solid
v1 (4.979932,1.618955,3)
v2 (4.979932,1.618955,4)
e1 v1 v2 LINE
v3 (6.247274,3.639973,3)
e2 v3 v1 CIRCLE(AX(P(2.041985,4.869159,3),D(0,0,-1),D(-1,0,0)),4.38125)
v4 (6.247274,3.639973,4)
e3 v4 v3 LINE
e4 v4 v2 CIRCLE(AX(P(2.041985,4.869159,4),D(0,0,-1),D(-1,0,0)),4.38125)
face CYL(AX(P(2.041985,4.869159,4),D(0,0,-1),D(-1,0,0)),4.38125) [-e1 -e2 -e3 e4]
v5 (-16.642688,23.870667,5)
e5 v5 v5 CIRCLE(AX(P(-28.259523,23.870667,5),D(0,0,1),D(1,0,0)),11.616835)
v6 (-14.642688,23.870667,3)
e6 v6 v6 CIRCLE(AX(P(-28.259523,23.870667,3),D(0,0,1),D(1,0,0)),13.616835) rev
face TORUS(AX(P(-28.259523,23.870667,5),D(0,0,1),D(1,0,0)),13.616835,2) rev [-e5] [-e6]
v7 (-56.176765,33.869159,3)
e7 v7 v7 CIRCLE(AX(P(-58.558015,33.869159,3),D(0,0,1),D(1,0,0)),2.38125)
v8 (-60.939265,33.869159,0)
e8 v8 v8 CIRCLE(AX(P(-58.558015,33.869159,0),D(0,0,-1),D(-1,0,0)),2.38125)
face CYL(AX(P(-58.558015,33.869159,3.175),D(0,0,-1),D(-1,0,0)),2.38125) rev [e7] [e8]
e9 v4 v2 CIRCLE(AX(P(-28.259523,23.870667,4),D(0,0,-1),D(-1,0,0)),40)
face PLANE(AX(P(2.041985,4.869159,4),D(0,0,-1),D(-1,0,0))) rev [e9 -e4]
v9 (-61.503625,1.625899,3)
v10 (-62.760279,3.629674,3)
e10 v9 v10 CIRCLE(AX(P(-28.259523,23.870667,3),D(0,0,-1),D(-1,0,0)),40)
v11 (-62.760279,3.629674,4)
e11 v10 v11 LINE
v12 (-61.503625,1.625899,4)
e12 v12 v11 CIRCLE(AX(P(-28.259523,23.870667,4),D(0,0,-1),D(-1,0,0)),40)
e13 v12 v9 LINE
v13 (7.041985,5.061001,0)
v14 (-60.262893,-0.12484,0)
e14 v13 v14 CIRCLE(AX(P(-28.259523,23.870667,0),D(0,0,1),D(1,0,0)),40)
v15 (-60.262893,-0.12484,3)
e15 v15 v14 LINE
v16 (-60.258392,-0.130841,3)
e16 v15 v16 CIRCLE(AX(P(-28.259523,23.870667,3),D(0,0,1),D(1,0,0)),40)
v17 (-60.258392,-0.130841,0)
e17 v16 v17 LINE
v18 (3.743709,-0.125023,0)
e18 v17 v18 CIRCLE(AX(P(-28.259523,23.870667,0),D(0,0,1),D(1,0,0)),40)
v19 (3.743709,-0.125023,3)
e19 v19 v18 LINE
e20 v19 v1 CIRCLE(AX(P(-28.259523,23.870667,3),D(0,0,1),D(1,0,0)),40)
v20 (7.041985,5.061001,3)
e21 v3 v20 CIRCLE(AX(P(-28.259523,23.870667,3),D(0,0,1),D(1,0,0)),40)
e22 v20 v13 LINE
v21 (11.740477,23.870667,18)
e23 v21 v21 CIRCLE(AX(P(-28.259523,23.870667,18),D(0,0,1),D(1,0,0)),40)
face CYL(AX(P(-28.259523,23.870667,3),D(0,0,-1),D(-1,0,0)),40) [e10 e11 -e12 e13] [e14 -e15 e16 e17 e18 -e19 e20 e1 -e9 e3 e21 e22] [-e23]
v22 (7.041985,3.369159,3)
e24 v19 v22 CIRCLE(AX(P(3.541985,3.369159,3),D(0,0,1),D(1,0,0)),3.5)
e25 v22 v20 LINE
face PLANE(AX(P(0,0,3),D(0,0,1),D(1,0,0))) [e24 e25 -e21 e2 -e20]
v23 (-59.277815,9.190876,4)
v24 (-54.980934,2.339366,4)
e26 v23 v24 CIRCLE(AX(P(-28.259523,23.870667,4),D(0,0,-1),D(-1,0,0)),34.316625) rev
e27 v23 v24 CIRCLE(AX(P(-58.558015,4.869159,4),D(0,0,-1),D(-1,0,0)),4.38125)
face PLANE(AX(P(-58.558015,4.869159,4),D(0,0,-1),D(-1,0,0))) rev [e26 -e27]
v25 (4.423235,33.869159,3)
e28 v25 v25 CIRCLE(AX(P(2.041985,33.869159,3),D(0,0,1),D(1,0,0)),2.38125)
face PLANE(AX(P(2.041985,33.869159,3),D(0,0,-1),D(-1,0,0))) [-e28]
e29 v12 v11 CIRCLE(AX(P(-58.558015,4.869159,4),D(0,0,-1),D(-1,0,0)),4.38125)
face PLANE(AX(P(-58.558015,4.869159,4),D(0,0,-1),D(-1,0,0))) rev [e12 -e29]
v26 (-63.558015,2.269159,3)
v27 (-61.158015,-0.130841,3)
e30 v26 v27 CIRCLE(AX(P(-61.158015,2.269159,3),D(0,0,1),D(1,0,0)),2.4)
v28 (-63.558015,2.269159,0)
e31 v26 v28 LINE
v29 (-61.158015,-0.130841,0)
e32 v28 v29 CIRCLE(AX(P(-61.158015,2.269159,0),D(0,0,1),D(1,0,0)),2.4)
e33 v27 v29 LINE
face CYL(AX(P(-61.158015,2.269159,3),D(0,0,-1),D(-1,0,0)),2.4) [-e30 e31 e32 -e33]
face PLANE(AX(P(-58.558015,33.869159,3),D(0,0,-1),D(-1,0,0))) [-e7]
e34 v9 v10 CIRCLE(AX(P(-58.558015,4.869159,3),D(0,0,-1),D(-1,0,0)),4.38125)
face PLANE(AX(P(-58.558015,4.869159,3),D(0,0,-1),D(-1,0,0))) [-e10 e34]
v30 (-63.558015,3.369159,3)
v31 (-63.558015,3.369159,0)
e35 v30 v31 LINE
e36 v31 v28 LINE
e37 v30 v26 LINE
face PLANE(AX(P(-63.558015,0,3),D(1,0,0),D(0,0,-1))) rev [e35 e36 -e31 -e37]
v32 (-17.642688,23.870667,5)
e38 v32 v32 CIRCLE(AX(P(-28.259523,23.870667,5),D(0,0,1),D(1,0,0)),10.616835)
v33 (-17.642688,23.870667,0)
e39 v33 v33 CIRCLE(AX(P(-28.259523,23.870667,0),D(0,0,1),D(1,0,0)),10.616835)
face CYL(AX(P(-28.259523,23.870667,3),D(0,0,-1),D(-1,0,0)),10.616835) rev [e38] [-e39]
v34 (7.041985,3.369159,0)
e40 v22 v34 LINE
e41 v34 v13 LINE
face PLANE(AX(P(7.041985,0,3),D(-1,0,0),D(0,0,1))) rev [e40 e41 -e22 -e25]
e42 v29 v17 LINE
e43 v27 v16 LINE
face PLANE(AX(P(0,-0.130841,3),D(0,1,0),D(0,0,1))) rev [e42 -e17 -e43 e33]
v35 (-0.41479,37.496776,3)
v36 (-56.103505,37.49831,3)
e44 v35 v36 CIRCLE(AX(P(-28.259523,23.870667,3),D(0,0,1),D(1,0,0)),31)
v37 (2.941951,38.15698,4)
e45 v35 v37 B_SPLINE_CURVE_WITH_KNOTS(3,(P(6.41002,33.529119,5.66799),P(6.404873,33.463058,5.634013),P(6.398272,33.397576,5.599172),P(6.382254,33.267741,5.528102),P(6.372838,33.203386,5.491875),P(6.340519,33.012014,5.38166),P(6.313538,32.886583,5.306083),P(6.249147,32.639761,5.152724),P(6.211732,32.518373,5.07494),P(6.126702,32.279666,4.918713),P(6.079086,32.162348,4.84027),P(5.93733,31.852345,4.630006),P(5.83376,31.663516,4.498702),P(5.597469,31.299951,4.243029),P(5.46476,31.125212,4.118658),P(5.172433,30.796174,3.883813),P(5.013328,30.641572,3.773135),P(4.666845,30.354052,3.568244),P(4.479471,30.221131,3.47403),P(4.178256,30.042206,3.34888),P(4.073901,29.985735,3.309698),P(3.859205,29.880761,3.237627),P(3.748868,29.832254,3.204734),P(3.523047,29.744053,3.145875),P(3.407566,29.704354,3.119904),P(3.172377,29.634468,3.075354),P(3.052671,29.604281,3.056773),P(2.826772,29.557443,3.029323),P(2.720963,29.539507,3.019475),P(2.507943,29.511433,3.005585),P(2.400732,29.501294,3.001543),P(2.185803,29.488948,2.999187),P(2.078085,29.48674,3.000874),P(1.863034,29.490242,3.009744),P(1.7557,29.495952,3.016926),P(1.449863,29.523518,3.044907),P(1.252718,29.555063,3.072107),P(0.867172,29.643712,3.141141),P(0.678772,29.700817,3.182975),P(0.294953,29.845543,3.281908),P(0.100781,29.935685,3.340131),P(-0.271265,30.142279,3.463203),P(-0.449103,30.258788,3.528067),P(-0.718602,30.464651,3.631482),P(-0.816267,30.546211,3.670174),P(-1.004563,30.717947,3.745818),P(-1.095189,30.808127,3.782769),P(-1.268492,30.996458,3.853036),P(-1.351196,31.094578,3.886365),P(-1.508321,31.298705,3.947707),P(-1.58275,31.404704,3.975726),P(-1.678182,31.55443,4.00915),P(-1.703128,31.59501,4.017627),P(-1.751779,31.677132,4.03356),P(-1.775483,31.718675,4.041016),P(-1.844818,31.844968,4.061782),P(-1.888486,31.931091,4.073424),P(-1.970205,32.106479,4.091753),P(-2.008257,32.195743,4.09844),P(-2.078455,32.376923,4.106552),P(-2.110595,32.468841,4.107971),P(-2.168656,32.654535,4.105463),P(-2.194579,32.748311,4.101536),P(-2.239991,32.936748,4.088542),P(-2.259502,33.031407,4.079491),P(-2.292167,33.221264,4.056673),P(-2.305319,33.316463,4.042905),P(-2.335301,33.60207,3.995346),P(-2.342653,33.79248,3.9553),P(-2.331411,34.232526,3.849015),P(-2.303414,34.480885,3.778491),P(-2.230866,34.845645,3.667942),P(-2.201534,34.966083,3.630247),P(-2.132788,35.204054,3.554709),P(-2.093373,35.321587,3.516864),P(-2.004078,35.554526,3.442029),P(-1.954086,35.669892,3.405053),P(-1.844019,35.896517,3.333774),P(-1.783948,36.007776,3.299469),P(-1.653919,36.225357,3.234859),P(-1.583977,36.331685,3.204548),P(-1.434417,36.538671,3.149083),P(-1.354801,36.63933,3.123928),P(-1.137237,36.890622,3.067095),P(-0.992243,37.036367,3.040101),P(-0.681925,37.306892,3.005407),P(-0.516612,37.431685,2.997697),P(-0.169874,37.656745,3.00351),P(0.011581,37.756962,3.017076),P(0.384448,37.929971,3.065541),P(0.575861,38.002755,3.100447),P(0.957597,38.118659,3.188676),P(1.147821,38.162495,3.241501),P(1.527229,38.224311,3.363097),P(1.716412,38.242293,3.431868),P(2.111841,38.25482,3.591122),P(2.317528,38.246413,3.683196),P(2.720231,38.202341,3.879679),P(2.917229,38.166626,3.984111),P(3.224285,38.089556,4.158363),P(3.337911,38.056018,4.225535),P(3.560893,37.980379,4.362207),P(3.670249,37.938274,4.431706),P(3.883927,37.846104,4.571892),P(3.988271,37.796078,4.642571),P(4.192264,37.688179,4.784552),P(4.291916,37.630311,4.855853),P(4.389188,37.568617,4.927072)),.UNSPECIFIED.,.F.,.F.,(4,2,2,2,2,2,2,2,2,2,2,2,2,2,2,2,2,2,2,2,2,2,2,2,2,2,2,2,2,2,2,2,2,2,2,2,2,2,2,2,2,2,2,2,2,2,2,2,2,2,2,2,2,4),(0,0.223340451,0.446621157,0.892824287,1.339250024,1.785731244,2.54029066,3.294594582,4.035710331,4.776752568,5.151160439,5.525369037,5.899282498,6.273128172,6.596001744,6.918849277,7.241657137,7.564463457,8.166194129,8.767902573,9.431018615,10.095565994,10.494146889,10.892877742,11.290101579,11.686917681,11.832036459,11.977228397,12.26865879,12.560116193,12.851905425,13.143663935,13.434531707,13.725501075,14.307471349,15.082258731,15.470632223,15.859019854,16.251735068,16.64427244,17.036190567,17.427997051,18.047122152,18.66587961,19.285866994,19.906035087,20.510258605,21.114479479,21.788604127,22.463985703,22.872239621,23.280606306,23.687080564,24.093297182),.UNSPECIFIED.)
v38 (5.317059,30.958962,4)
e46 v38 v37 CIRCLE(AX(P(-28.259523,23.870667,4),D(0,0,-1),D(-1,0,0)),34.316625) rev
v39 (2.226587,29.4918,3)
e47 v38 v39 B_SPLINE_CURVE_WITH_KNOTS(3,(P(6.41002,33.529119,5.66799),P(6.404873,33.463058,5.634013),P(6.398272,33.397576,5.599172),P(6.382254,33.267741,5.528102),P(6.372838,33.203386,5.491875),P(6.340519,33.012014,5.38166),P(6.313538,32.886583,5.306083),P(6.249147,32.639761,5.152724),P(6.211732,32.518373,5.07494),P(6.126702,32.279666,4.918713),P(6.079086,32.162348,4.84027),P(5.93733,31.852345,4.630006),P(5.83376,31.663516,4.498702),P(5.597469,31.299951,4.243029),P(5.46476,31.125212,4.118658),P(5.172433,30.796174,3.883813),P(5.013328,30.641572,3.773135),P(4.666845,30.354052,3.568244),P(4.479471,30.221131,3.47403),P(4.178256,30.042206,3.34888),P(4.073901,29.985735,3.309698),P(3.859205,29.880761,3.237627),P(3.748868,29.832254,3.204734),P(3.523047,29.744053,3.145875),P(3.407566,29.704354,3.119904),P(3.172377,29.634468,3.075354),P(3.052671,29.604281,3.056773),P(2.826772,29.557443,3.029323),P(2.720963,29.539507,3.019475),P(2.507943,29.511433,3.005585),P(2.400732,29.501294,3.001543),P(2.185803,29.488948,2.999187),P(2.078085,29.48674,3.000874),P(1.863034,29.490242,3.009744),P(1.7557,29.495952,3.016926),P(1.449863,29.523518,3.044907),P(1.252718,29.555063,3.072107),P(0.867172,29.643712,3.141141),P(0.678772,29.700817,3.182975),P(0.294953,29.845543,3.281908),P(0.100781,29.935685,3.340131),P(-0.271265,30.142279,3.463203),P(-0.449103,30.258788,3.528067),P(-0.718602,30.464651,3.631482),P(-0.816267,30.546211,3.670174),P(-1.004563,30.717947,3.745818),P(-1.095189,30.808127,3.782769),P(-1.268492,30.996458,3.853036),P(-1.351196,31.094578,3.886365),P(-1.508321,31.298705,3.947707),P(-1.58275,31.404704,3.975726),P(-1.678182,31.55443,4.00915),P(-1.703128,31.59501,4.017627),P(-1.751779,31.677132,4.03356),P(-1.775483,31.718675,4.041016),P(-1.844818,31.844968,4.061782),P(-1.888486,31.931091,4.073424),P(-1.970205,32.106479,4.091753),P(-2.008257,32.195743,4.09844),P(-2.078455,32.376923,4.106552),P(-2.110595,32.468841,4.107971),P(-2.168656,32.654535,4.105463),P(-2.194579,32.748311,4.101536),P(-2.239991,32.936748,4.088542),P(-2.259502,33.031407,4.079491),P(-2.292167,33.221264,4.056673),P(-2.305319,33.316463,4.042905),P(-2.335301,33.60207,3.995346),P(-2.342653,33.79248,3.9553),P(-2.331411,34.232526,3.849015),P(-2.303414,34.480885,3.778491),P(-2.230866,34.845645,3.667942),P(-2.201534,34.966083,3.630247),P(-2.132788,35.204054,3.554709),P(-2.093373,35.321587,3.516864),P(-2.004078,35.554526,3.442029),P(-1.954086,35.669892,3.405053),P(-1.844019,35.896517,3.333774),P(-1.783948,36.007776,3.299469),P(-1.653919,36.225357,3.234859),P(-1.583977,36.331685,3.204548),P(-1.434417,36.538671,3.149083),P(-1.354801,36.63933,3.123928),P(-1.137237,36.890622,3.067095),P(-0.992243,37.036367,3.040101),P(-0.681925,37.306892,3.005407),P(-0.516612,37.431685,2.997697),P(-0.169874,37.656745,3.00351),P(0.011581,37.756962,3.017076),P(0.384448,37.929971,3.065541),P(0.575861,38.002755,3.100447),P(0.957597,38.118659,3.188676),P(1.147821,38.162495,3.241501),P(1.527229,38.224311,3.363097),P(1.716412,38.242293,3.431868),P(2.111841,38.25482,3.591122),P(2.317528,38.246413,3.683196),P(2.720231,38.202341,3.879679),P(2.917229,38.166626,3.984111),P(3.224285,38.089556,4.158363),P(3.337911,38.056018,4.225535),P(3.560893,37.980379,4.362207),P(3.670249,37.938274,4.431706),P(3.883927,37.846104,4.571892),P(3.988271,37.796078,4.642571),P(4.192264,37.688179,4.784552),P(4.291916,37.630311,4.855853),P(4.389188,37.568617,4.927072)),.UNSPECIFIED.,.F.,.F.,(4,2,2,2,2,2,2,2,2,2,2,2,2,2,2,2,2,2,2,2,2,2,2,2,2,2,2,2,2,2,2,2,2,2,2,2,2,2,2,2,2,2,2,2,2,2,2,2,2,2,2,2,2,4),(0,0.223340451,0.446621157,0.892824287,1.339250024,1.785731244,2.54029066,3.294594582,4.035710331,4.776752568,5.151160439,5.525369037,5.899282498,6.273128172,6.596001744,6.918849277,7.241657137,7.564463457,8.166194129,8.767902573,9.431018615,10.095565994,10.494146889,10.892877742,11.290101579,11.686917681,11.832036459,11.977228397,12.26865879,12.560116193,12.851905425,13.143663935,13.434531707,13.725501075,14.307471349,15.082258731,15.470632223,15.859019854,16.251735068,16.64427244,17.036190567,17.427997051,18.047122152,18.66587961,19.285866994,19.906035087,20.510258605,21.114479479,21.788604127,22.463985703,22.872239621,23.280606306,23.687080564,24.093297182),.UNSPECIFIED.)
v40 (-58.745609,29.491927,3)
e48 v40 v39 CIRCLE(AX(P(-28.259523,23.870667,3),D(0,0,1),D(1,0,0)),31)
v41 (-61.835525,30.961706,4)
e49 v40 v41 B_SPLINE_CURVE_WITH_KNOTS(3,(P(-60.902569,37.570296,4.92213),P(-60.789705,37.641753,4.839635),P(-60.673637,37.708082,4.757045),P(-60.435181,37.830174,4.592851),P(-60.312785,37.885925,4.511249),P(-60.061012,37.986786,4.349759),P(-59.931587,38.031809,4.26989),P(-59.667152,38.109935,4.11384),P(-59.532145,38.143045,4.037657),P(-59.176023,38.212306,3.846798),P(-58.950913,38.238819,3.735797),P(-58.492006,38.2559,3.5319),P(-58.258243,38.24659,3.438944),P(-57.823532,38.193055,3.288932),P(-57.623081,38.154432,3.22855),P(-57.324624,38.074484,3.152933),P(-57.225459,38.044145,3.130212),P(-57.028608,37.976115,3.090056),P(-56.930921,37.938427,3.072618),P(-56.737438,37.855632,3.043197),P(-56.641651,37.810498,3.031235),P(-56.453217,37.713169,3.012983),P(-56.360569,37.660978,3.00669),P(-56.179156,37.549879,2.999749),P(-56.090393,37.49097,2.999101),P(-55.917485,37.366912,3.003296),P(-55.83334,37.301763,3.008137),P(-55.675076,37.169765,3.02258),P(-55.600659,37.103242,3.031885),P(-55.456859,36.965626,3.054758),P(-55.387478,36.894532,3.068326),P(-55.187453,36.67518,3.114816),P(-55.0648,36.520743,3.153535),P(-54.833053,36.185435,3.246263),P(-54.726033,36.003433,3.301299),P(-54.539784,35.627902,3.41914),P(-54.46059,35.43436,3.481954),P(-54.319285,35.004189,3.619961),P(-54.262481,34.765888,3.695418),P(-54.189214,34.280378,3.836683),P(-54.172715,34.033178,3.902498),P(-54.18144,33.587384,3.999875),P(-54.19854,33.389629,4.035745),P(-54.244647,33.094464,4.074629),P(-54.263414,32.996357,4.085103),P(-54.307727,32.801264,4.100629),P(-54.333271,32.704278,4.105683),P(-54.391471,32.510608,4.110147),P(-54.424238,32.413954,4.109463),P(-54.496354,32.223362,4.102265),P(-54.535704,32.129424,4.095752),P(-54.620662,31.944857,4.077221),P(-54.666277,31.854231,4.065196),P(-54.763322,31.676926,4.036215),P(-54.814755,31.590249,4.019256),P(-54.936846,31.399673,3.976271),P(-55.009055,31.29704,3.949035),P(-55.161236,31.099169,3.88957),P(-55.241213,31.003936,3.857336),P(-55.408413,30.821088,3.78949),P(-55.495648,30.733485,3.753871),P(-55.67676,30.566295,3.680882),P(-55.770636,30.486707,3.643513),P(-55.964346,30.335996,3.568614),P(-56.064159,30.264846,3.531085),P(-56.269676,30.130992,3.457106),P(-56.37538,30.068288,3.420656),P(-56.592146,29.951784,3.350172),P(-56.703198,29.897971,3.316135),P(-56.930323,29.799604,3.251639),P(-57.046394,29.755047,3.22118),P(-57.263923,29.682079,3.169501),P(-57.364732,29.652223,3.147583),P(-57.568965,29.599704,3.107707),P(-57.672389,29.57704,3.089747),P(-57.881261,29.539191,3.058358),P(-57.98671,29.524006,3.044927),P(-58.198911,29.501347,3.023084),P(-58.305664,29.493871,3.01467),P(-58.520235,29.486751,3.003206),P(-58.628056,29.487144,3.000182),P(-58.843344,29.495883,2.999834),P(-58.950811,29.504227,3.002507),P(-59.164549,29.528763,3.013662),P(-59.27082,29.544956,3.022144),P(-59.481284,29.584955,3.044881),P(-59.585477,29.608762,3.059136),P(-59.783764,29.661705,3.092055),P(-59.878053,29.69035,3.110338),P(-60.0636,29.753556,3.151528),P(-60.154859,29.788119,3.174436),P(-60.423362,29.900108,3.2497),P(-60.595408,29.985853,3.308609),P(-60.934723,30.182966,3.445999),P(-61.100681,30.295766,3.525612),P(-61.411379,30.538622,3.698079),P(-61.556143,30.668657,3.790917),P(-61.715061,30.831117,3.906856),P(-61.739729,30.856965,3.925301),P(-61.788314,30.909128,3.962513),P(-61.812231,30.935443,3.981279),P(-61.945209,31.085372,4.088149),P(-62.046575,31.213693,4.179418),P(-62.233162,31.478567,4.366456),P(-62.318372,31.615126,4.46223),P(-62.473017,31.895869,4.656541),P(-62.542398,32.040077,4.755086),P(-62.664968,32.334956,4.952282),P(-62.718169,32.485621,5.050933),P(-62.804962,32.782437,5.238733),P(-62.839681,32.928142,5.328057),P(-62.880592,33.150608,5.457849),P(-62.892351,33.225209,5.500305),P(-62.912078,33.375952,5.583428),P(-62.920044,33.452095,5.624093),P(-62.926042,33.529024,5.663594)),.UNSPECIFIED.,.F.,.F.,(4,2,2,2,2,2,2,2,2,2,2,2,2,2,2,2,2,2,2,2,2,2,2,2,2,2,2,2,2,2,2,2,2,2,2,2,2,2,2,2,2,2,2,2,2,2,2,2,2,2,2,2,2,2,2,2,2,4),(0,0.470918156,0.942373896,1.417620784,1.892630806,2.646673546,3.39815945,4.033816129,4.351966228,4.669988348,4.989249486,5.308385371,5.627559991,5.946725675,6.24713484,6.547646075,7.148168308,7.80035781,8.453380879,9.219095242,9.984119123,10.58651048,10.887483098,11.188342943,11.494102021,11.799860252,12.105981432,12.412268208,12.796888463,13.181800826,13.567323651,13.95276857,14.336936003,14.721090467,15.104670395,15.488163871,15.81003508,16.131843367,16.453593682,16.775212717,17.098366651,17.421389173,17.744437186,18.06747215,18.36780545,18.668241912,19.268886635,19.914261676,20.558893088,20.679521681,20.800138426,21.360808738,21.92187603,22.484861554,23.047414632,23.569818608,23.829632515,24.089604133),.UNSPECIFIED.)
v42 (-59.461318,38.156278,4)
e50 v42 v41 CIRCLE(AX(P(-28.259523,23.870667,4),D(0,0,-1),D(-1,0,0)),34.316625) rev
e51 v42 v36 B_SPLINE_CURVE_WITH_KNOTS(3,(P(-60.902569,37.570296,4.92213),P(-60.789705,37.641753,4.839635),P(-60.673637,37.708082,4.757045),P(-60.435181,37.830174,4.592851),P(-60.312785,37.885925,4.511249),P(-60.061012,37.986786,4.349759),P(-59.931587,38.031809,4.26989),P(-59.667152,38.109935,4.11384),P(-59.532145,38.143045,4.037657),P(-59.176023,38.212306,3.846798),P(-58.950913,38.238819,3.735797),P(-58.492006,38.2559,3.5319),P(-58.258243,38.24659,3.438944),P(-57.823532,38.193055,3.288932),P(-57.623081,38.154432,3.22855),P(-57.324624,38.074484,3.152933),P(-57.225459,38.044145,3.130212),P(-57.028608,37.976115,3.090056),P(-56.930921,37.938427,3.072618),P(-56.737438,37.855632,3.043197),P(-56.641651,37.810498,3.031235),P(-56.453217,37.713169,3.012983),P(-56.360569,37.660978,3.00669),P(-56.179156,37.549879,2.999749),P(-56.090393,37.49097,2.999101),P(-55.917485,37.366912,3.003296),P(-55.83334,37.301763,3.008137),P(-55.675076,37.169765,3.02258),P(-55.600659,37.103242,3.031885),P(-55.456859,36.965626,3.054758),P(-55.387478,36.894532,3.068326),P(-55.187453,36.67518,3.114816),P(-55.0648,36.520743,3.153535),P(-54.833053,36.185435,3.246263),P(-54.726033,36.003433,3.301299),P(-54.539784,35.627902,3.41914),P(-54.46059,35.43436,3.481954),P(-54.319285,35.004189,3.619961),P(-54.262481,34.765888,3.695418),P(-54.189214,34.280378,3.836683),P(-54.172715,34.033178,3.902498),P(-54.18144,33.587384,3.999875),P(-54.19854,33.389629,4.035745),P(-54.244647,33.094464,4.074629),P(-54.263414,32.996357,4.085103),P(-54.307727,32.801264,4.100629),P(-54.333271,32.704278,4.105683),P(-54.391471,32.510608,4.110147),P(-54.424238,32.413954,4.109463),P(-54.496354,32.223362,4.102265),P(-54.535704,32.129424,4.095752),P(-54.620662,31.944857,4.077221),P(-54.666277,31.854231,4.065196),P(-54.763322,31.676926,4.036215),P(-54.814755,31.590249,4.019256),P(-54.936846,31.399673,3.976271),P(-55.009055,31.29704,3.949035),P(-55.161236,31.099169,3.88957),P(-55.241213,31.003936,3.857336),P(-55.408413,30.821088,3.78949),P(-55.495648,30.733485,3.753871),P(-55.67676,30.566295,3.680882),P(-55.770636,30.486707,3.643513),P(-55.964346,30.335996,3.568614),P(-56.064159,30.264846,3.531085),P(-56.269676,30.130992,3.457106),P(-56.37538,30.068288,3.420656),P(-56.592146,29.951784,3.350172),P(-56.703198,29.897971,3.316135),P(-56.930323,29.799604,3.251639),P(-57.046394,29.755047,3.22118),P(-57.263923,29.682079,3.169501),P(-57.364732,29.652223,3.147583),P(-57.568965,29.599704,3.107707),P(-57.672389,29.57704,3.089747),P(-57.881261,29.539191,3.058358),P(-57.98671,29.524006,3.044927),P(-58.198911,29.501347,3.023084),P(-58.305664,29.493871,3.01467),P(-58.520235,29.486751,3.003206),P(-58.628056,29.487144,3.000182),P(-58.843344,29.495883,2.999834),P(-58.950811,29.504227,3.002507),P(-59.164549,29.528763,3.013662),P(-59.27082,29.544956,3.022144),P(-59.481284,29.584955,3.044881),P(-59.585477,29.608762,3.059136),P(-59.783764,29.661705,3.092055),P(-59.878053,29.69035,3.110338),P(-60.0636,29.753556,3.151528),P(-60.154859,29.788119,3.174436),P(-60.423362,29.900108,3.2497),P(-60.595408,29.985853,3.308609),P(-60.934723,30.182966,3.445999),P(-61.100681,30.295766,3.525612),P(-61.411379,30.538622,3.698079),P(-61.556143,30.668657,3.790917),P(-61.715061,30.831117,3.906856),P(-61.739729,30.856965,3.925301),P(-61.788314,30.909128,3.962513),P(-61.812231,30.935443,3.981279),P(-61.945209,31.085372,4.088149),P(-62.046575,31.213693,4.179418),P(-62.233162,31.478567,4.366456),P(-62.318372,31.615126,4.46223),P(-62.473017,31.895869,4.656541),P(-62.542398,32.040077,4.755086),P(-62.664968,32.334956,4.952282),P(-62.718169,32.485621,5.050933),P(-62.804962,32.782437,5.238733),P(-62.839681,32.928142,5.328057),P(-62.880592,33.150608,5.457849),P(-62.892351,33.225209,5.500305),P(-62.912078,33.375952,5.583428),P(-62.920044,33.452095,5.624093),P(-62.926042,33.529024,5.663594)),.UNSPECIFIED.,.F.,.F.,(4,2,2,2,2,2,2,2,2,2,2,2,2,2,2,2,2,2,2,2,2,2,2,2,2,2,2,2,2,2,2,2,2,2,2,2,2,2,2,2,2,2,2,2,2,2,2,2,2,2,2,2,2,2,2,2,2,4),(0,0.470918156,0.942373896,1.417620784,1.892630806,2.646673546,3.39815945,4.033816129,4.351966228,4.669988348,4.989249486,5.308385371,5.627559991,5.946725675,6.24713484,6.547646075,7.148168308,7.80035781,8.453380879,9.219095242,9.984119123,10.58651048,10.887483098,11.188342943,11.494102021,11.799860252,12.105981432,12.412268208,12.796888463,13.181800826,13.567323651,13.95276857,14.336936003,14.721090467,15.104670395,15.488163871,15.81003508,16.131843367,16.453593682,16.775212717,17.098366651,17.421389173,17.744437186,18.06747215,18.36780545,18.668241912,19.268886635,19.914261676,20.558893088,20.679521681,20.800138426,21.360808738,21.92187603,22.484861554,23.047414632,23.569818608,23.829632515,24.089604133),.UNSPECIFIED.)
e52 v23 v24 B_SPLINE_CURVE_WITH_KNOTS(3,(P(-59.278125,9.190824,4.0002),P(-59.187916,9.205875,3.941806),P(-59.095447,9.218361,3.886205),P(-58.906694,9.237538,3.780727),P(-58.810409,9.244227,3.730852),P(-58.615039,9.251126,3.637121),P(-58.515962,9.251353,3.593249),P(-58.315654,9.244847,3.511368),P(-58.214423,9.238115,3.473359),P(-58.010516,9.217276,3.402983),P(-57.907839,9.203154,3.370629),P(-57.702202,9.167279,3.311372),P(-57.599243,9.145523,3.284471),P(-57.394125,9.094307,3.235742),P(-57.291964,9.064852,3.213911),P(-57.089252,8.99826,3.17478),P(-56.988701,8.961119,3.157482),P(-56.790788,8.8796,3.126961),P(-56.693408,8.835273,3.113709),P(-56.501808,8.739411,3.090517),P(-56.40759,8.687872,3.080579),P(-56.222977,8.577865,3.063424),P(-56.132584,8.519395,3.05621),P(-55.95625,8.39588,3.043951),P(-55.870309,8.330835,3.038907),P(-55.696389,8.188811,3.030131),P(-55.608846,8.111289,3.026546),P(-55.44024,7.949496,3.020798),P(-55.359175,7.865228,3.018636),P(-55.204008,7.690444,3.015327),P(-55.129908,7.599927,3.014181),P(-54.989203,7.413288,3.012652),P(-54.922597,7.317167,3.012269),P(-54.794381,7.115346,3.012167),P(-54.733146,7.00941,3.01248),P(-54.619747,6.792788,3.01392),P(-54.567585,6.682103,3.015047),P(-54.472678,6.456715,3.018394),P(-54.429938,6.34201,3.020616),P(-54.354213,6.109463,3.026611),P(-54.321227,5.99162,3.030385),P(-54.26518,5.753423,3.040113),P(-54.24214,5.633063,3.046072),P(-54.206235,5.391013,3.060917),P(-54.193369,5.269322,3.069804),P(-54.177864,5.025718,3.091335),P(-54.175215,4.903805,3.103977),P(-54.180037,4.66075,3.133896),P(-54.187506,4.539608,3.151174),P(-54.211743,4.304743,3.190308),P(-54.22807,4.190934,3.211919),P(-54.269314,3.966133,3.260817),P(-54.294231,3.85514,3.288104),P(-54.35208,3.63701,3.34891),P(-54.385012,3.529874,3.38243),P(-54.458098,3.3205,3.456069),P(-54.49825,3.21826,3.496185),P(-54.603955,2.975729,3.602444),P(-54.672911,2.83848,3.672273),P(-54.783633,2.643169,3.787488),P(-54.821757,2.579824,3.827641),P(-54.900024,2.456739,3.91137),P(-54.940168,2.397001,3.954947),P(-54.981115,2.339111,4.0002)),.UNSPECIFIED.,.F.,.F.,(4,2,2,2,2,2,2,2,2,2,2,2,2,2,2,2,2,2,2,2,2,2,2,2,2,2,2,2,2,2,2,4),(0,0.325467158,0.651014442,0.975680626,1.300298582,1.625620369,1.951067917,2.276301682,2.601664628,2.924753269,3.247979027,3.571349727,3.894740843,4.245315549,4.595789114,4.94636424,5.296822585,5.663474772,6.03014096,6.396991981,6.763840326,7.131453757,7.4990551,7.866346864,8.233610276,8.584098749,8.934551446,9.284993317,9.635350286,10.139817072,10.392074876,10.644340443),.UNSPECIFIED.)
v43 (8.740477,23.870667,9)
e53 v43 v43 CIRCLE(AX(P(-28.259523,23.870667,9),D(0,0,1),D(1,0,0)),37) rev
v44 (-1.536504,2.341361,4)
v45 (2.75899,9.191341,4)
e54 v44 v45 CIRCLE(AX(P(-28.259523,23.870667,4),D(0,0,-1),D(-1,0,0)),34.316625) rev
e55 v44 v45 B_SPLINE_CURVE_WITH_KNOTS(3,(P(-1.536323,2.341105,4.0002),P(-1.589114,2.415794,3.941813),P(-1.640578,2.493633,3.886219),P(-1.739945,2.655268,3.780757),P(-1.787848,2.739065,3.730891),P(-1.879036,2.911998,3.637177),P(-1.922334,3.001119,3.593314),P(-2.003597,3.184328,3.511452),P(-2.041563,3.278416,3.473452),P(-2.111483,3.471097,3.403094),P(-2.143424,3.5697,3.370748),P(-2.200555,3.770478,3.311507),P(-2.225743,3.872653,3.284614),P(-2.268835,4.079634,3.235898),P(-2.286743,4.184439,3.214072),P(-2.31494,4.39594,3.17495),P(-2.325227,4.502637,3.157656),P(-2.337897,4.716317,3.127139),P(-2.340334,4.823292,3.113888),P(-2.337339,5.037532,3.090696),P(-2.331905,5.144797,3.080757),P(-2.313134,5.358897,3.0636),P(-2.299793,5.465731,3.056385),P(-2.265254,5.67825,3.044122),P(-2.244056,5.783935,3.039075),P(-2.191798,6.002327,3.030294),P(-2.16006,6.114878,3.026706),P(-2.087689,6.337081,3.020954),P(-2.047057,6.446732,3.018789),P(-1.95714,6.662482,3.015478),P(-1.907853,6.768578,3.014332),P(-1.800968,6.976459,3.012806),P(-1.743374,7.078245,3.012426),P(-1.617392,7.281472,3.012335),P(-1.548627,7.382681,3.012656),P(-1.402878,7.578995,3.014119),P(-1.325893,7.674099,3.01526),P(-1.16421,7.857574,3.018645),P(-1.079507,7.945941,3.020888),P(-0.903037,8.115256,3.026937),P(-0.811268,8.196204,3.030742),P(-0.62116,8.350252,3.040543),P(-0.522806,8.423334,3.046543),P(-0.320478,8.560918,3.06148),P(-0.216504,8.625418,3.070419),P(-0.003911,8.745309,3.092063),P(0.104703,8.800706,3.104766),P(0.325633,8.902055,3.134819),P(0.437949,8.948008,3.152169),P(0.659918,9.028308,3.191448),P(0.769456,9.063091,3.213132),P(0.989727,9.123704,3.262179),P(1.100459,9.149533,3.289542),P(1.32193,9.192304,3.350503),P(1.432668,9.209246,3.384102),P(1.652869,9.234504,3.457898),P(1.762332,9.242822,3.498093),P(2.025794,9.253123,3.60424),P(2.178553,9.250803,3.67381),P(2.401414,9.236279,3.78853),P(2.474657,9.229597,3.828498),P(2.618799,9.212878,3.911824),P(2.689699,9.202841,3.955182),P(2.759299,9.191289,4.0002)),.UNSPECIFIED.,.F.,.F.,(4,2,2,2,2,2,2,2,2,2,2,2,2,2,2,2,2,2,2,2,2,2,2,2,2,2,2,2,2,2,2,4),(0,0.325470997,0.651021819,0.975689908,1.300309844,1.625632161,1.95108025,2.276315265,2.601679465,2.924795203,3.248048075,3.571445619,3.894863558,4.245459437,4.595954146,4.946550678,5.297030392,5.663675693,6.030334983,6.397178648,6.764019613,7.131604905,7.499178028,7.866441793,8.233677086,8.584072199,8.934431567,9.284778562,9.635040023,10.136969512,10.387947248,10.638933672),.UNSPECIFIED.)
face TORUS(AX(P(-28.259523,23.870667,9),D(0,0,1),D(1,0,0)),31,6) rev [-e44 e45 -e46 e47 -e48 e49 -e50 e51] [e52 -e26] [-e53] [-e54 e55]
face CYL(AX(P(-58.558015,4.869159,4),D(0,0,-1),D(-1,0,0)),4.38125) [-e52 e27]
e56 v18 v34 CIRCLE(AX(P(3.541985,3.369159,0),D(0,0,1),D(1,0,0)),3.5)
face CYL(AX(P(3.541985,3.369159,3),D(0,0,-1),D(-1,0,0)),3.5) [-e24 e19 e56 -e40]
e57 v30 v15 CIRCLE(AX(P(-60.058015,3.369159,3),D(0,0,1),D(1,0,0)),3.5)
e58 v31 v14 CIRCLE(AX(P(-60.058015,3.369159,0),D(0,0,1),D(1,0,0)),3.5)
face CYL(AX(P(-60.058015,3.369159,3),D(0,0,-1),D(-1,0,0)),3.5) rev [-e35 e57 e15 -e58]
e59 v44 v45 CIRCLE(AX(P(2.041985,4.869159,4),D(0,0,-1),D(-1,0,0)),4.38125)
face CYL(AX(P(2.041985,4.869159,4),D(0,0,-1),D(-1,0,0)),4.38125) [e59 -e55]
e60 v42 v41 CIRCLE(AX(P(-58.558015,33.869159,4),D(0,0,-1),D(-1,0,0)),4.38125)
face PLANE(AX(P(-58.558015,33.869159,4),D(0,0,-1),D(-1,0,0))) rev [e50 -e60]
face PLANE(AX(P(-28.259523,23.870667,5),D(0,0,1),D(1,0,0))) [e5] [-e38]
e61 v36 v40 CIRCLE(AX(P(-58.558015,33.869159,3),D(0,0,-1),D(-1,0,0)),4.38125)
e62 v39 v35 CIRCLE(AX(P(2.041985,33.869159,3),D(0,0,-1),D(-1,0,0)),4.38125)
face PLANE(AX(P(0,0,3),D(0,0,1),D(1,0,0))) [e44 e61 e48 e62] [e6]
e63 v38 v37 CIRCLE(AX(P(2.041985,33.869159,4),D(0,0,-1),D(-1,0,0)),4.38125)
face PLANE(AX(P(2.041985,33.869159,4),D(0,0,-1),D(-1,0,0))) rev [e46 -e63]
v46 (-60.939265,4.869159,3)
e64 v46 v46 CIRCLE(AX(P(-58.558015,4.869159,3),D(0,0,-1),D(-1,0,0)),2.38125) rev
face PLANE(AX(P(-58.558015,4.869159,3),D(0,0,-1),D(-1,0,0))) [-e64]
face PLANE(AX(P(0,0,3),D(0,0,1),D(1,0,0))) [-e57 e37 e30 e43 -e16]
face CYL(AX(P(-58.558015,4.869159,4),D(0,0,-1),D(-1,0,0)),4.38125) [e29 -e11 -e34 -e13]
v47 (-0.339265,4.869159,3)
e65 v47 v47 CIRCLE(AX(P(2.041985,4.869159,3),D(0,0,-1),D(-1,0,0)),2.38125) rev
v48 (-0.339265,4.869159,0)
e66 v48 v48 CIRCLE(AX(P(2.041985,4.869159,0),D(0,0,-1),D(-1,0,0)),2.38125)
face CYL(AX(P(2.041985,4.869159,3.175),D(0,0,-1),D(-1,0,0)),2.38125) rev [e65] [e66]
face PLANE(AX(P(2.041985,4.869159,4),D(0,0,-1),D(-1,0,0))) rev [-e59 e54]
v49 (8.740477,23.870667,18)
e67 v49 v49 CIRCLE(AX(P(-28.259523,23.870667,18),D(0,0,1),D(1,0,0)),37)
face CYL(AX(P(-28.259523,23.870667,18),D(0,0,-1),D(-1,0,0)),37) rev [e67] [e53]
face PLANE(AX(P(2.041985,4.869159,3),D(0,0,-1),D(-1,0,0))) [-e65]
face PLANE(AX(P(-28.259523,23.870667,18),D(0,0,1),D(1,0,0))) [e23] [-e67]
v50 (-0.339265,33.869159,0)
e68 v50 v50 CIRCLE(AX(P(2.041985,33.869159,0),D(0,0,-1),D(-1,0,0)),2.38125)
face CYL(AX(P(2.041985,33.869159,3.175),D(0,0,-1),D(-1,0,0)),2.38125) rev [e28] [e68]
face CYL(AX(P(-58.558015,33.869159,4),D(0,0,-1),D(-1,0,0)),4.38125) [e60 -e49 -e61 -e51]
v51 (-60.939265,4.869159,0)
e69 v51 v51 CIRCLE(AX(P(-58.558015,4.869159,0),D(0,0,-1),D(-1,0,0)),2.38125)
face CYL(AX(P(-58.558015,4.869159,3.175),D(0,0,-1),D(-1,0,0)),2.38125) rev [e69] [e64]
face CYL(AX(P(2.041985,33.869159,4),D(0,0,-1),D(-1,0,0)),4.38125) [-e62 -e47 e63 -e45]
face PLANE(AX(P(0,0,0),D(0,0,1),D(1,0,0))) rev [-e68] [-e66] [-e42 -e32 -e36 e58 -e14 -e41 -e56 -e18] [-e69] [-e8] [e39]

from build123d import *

# Parameters (mm, degrees)
BOSS_EXTRUDE1_OUTLINE_R = 10.616834944
BOSS_EXTRUDE1_DEPTH     = 3
SKETCH3_R               = 40
SKETCH3_R_2             = 37
BOSS_EXTRUDE2_DEPTH     = 15
SKETCH4_R               = 11.616834944
SKETCH4_R_2             = 10.616834944
BOSS_EXTRUDE3_DEPTH     = 2
FILLET2_R               = 2
FILLET3_R               = 6
SKETCH6_R               = 2.38125
CUT_EXTRUDE1_DEPTH      = 3.175
SKETCH8_R               = 4.38125
BOSS_EXTRUDE5_DEPTH     = 1


# Read off the part's stored shape, not the designer's step: Boss-Extrude1
with BuildPart() as part:
    # Boss-Extrude1 outline → Boss-Extrude1 (new body)
    with BuildSketch(Plane.XY):
        with BuildLine():
            Line((-61.158014619, -0.130841154), (-60.258391765, -0.130841154))
            ThreePointArc((-60.258391765, -0.130841154), (-28.255886619, -16.129333036), (3.743709339, -0.125023097))
            ThreePointArc((3.743709339, -0.125023097), (6.087180251, 0.966663669), (7.041985381, 3.369158846))
            Line((7.041985381, 3.369158846), (7.041985381, 5.061001168))
            ThreePointArc((7.041985381, 5.061001168), (-31.332414811, 63.752458818), (-60.262892503, -0.124839588))
            ThreePointArc((-60.262892503, -0.124839588), (-62.604293531, 0.967812618), (-63.558014619, 3.369158846))
            Line((-63.558014619, 3.369158846), (-63.558014619, 2.269158846))
            ThreePointArc((-63.558014619, 2.269158846), (-62.855070894, 0.572102571), (-61.158014619, -0.130841154))
        make_face()
        with Locations((-28.259522786, 23.870666799)):
            Circle(BOSS_EXTRUDE1_OUTLINE_R, mode=Mode.SUBTRACT)
    extrude(amount=BOSS_EXTRUDE1_DEPTH)

    # Sketch3 → Boss-Extrude2 (add)
    with BuildSketch(Plane.XY.offset(3)):
        with Locations(Location((-28.259522786, 23.870666799, 0), (0, 0, 216.861852286))):
            Circle(SKETCH3_R)
        with Locations((-28.259522786, 23.870666799)):
            Circle(SKETCH3_R_2, mode=Mode.SUBTRACT)
    extrude(amount=BOSS_EXTRUDE2_DEPTH)

    # Sketch4 → Boss-Extrude3 (add)
    with BuildSketch(Plane.XY.offset(3)):
        with Locations((-28.259522786, 23.870666799)):
            Circle(SKETCH4_R)
        with Locations((-28.259522786, 23.870666799)):
            Circle(SKETCH4_R_2, mode=Mode.SUBTRACT)
    extrude(amount=BOSS_EXTRUDE3_DEPTH)

    # Fillet2
    fillet2_edges = [part.edges().sort_by_distance(p)[0] for p in [
        (-39.87635773, 23.870666799, 3),
    ]]
    fillet(fillet2_edges, radius=FILLET2_R - 0.0001)  # a hair under: the kernel refuses the full size

    # Fillet3
    fillet3_edges = [part.edges().sort_by_distance(p)[0] for p in [
        (-65.259522786, 23.870666799, 3),
    ]]
    fillet(fillet3_edges, radius=FILLET3_R)

    # Sketch6 → Cut-Extrude1 (cut)
    with BuildSketch(Plane(origin=(0, 0, 0), x_dir=(-1, 0, 0), z_dir=(0, 0, -1))):
        with Locations((58.558014619, 4.869158846)):
            Circle(SKETCH6_R)
        with Locations((58.558014619, 33.869158846)):
            Circle(SKETCH6_R)
        with Locations((-2.041985381, 33.869158846)):
            Circle(SKETCH6_R)
        with Locations((-2.041985381, 4.869158846)):
            Circle(SKETCH6_R)
    extrude(amount=-CUT_EXTRUDE1_DEPTH, mode=Mode.SUBTRACT)

    # Sketch8 → Boss-Extrude5 (add)
    with BuildSketch(Plane(origin=(0, 0, 3), x_dir=(-1, 0, 0), z_dir=(0, 0, -1))):
        with Locations((58.558014619, 4.869158846)):
            Circle(SKETCH8_R)
        with Locations((58.558014619, 33.869158846)):
            Circle(SKETCH8_R)
        with Locations((-2.041985381, 33.869158846)):
            Circle(SKETCH8_R)
        with Locations((-2.041985381, 4.869158846)):
            Circle(SKETCH8_R)
    extrude(amount=-BOSS_EXTRUDE5_DEPTH)


solid = part.part
